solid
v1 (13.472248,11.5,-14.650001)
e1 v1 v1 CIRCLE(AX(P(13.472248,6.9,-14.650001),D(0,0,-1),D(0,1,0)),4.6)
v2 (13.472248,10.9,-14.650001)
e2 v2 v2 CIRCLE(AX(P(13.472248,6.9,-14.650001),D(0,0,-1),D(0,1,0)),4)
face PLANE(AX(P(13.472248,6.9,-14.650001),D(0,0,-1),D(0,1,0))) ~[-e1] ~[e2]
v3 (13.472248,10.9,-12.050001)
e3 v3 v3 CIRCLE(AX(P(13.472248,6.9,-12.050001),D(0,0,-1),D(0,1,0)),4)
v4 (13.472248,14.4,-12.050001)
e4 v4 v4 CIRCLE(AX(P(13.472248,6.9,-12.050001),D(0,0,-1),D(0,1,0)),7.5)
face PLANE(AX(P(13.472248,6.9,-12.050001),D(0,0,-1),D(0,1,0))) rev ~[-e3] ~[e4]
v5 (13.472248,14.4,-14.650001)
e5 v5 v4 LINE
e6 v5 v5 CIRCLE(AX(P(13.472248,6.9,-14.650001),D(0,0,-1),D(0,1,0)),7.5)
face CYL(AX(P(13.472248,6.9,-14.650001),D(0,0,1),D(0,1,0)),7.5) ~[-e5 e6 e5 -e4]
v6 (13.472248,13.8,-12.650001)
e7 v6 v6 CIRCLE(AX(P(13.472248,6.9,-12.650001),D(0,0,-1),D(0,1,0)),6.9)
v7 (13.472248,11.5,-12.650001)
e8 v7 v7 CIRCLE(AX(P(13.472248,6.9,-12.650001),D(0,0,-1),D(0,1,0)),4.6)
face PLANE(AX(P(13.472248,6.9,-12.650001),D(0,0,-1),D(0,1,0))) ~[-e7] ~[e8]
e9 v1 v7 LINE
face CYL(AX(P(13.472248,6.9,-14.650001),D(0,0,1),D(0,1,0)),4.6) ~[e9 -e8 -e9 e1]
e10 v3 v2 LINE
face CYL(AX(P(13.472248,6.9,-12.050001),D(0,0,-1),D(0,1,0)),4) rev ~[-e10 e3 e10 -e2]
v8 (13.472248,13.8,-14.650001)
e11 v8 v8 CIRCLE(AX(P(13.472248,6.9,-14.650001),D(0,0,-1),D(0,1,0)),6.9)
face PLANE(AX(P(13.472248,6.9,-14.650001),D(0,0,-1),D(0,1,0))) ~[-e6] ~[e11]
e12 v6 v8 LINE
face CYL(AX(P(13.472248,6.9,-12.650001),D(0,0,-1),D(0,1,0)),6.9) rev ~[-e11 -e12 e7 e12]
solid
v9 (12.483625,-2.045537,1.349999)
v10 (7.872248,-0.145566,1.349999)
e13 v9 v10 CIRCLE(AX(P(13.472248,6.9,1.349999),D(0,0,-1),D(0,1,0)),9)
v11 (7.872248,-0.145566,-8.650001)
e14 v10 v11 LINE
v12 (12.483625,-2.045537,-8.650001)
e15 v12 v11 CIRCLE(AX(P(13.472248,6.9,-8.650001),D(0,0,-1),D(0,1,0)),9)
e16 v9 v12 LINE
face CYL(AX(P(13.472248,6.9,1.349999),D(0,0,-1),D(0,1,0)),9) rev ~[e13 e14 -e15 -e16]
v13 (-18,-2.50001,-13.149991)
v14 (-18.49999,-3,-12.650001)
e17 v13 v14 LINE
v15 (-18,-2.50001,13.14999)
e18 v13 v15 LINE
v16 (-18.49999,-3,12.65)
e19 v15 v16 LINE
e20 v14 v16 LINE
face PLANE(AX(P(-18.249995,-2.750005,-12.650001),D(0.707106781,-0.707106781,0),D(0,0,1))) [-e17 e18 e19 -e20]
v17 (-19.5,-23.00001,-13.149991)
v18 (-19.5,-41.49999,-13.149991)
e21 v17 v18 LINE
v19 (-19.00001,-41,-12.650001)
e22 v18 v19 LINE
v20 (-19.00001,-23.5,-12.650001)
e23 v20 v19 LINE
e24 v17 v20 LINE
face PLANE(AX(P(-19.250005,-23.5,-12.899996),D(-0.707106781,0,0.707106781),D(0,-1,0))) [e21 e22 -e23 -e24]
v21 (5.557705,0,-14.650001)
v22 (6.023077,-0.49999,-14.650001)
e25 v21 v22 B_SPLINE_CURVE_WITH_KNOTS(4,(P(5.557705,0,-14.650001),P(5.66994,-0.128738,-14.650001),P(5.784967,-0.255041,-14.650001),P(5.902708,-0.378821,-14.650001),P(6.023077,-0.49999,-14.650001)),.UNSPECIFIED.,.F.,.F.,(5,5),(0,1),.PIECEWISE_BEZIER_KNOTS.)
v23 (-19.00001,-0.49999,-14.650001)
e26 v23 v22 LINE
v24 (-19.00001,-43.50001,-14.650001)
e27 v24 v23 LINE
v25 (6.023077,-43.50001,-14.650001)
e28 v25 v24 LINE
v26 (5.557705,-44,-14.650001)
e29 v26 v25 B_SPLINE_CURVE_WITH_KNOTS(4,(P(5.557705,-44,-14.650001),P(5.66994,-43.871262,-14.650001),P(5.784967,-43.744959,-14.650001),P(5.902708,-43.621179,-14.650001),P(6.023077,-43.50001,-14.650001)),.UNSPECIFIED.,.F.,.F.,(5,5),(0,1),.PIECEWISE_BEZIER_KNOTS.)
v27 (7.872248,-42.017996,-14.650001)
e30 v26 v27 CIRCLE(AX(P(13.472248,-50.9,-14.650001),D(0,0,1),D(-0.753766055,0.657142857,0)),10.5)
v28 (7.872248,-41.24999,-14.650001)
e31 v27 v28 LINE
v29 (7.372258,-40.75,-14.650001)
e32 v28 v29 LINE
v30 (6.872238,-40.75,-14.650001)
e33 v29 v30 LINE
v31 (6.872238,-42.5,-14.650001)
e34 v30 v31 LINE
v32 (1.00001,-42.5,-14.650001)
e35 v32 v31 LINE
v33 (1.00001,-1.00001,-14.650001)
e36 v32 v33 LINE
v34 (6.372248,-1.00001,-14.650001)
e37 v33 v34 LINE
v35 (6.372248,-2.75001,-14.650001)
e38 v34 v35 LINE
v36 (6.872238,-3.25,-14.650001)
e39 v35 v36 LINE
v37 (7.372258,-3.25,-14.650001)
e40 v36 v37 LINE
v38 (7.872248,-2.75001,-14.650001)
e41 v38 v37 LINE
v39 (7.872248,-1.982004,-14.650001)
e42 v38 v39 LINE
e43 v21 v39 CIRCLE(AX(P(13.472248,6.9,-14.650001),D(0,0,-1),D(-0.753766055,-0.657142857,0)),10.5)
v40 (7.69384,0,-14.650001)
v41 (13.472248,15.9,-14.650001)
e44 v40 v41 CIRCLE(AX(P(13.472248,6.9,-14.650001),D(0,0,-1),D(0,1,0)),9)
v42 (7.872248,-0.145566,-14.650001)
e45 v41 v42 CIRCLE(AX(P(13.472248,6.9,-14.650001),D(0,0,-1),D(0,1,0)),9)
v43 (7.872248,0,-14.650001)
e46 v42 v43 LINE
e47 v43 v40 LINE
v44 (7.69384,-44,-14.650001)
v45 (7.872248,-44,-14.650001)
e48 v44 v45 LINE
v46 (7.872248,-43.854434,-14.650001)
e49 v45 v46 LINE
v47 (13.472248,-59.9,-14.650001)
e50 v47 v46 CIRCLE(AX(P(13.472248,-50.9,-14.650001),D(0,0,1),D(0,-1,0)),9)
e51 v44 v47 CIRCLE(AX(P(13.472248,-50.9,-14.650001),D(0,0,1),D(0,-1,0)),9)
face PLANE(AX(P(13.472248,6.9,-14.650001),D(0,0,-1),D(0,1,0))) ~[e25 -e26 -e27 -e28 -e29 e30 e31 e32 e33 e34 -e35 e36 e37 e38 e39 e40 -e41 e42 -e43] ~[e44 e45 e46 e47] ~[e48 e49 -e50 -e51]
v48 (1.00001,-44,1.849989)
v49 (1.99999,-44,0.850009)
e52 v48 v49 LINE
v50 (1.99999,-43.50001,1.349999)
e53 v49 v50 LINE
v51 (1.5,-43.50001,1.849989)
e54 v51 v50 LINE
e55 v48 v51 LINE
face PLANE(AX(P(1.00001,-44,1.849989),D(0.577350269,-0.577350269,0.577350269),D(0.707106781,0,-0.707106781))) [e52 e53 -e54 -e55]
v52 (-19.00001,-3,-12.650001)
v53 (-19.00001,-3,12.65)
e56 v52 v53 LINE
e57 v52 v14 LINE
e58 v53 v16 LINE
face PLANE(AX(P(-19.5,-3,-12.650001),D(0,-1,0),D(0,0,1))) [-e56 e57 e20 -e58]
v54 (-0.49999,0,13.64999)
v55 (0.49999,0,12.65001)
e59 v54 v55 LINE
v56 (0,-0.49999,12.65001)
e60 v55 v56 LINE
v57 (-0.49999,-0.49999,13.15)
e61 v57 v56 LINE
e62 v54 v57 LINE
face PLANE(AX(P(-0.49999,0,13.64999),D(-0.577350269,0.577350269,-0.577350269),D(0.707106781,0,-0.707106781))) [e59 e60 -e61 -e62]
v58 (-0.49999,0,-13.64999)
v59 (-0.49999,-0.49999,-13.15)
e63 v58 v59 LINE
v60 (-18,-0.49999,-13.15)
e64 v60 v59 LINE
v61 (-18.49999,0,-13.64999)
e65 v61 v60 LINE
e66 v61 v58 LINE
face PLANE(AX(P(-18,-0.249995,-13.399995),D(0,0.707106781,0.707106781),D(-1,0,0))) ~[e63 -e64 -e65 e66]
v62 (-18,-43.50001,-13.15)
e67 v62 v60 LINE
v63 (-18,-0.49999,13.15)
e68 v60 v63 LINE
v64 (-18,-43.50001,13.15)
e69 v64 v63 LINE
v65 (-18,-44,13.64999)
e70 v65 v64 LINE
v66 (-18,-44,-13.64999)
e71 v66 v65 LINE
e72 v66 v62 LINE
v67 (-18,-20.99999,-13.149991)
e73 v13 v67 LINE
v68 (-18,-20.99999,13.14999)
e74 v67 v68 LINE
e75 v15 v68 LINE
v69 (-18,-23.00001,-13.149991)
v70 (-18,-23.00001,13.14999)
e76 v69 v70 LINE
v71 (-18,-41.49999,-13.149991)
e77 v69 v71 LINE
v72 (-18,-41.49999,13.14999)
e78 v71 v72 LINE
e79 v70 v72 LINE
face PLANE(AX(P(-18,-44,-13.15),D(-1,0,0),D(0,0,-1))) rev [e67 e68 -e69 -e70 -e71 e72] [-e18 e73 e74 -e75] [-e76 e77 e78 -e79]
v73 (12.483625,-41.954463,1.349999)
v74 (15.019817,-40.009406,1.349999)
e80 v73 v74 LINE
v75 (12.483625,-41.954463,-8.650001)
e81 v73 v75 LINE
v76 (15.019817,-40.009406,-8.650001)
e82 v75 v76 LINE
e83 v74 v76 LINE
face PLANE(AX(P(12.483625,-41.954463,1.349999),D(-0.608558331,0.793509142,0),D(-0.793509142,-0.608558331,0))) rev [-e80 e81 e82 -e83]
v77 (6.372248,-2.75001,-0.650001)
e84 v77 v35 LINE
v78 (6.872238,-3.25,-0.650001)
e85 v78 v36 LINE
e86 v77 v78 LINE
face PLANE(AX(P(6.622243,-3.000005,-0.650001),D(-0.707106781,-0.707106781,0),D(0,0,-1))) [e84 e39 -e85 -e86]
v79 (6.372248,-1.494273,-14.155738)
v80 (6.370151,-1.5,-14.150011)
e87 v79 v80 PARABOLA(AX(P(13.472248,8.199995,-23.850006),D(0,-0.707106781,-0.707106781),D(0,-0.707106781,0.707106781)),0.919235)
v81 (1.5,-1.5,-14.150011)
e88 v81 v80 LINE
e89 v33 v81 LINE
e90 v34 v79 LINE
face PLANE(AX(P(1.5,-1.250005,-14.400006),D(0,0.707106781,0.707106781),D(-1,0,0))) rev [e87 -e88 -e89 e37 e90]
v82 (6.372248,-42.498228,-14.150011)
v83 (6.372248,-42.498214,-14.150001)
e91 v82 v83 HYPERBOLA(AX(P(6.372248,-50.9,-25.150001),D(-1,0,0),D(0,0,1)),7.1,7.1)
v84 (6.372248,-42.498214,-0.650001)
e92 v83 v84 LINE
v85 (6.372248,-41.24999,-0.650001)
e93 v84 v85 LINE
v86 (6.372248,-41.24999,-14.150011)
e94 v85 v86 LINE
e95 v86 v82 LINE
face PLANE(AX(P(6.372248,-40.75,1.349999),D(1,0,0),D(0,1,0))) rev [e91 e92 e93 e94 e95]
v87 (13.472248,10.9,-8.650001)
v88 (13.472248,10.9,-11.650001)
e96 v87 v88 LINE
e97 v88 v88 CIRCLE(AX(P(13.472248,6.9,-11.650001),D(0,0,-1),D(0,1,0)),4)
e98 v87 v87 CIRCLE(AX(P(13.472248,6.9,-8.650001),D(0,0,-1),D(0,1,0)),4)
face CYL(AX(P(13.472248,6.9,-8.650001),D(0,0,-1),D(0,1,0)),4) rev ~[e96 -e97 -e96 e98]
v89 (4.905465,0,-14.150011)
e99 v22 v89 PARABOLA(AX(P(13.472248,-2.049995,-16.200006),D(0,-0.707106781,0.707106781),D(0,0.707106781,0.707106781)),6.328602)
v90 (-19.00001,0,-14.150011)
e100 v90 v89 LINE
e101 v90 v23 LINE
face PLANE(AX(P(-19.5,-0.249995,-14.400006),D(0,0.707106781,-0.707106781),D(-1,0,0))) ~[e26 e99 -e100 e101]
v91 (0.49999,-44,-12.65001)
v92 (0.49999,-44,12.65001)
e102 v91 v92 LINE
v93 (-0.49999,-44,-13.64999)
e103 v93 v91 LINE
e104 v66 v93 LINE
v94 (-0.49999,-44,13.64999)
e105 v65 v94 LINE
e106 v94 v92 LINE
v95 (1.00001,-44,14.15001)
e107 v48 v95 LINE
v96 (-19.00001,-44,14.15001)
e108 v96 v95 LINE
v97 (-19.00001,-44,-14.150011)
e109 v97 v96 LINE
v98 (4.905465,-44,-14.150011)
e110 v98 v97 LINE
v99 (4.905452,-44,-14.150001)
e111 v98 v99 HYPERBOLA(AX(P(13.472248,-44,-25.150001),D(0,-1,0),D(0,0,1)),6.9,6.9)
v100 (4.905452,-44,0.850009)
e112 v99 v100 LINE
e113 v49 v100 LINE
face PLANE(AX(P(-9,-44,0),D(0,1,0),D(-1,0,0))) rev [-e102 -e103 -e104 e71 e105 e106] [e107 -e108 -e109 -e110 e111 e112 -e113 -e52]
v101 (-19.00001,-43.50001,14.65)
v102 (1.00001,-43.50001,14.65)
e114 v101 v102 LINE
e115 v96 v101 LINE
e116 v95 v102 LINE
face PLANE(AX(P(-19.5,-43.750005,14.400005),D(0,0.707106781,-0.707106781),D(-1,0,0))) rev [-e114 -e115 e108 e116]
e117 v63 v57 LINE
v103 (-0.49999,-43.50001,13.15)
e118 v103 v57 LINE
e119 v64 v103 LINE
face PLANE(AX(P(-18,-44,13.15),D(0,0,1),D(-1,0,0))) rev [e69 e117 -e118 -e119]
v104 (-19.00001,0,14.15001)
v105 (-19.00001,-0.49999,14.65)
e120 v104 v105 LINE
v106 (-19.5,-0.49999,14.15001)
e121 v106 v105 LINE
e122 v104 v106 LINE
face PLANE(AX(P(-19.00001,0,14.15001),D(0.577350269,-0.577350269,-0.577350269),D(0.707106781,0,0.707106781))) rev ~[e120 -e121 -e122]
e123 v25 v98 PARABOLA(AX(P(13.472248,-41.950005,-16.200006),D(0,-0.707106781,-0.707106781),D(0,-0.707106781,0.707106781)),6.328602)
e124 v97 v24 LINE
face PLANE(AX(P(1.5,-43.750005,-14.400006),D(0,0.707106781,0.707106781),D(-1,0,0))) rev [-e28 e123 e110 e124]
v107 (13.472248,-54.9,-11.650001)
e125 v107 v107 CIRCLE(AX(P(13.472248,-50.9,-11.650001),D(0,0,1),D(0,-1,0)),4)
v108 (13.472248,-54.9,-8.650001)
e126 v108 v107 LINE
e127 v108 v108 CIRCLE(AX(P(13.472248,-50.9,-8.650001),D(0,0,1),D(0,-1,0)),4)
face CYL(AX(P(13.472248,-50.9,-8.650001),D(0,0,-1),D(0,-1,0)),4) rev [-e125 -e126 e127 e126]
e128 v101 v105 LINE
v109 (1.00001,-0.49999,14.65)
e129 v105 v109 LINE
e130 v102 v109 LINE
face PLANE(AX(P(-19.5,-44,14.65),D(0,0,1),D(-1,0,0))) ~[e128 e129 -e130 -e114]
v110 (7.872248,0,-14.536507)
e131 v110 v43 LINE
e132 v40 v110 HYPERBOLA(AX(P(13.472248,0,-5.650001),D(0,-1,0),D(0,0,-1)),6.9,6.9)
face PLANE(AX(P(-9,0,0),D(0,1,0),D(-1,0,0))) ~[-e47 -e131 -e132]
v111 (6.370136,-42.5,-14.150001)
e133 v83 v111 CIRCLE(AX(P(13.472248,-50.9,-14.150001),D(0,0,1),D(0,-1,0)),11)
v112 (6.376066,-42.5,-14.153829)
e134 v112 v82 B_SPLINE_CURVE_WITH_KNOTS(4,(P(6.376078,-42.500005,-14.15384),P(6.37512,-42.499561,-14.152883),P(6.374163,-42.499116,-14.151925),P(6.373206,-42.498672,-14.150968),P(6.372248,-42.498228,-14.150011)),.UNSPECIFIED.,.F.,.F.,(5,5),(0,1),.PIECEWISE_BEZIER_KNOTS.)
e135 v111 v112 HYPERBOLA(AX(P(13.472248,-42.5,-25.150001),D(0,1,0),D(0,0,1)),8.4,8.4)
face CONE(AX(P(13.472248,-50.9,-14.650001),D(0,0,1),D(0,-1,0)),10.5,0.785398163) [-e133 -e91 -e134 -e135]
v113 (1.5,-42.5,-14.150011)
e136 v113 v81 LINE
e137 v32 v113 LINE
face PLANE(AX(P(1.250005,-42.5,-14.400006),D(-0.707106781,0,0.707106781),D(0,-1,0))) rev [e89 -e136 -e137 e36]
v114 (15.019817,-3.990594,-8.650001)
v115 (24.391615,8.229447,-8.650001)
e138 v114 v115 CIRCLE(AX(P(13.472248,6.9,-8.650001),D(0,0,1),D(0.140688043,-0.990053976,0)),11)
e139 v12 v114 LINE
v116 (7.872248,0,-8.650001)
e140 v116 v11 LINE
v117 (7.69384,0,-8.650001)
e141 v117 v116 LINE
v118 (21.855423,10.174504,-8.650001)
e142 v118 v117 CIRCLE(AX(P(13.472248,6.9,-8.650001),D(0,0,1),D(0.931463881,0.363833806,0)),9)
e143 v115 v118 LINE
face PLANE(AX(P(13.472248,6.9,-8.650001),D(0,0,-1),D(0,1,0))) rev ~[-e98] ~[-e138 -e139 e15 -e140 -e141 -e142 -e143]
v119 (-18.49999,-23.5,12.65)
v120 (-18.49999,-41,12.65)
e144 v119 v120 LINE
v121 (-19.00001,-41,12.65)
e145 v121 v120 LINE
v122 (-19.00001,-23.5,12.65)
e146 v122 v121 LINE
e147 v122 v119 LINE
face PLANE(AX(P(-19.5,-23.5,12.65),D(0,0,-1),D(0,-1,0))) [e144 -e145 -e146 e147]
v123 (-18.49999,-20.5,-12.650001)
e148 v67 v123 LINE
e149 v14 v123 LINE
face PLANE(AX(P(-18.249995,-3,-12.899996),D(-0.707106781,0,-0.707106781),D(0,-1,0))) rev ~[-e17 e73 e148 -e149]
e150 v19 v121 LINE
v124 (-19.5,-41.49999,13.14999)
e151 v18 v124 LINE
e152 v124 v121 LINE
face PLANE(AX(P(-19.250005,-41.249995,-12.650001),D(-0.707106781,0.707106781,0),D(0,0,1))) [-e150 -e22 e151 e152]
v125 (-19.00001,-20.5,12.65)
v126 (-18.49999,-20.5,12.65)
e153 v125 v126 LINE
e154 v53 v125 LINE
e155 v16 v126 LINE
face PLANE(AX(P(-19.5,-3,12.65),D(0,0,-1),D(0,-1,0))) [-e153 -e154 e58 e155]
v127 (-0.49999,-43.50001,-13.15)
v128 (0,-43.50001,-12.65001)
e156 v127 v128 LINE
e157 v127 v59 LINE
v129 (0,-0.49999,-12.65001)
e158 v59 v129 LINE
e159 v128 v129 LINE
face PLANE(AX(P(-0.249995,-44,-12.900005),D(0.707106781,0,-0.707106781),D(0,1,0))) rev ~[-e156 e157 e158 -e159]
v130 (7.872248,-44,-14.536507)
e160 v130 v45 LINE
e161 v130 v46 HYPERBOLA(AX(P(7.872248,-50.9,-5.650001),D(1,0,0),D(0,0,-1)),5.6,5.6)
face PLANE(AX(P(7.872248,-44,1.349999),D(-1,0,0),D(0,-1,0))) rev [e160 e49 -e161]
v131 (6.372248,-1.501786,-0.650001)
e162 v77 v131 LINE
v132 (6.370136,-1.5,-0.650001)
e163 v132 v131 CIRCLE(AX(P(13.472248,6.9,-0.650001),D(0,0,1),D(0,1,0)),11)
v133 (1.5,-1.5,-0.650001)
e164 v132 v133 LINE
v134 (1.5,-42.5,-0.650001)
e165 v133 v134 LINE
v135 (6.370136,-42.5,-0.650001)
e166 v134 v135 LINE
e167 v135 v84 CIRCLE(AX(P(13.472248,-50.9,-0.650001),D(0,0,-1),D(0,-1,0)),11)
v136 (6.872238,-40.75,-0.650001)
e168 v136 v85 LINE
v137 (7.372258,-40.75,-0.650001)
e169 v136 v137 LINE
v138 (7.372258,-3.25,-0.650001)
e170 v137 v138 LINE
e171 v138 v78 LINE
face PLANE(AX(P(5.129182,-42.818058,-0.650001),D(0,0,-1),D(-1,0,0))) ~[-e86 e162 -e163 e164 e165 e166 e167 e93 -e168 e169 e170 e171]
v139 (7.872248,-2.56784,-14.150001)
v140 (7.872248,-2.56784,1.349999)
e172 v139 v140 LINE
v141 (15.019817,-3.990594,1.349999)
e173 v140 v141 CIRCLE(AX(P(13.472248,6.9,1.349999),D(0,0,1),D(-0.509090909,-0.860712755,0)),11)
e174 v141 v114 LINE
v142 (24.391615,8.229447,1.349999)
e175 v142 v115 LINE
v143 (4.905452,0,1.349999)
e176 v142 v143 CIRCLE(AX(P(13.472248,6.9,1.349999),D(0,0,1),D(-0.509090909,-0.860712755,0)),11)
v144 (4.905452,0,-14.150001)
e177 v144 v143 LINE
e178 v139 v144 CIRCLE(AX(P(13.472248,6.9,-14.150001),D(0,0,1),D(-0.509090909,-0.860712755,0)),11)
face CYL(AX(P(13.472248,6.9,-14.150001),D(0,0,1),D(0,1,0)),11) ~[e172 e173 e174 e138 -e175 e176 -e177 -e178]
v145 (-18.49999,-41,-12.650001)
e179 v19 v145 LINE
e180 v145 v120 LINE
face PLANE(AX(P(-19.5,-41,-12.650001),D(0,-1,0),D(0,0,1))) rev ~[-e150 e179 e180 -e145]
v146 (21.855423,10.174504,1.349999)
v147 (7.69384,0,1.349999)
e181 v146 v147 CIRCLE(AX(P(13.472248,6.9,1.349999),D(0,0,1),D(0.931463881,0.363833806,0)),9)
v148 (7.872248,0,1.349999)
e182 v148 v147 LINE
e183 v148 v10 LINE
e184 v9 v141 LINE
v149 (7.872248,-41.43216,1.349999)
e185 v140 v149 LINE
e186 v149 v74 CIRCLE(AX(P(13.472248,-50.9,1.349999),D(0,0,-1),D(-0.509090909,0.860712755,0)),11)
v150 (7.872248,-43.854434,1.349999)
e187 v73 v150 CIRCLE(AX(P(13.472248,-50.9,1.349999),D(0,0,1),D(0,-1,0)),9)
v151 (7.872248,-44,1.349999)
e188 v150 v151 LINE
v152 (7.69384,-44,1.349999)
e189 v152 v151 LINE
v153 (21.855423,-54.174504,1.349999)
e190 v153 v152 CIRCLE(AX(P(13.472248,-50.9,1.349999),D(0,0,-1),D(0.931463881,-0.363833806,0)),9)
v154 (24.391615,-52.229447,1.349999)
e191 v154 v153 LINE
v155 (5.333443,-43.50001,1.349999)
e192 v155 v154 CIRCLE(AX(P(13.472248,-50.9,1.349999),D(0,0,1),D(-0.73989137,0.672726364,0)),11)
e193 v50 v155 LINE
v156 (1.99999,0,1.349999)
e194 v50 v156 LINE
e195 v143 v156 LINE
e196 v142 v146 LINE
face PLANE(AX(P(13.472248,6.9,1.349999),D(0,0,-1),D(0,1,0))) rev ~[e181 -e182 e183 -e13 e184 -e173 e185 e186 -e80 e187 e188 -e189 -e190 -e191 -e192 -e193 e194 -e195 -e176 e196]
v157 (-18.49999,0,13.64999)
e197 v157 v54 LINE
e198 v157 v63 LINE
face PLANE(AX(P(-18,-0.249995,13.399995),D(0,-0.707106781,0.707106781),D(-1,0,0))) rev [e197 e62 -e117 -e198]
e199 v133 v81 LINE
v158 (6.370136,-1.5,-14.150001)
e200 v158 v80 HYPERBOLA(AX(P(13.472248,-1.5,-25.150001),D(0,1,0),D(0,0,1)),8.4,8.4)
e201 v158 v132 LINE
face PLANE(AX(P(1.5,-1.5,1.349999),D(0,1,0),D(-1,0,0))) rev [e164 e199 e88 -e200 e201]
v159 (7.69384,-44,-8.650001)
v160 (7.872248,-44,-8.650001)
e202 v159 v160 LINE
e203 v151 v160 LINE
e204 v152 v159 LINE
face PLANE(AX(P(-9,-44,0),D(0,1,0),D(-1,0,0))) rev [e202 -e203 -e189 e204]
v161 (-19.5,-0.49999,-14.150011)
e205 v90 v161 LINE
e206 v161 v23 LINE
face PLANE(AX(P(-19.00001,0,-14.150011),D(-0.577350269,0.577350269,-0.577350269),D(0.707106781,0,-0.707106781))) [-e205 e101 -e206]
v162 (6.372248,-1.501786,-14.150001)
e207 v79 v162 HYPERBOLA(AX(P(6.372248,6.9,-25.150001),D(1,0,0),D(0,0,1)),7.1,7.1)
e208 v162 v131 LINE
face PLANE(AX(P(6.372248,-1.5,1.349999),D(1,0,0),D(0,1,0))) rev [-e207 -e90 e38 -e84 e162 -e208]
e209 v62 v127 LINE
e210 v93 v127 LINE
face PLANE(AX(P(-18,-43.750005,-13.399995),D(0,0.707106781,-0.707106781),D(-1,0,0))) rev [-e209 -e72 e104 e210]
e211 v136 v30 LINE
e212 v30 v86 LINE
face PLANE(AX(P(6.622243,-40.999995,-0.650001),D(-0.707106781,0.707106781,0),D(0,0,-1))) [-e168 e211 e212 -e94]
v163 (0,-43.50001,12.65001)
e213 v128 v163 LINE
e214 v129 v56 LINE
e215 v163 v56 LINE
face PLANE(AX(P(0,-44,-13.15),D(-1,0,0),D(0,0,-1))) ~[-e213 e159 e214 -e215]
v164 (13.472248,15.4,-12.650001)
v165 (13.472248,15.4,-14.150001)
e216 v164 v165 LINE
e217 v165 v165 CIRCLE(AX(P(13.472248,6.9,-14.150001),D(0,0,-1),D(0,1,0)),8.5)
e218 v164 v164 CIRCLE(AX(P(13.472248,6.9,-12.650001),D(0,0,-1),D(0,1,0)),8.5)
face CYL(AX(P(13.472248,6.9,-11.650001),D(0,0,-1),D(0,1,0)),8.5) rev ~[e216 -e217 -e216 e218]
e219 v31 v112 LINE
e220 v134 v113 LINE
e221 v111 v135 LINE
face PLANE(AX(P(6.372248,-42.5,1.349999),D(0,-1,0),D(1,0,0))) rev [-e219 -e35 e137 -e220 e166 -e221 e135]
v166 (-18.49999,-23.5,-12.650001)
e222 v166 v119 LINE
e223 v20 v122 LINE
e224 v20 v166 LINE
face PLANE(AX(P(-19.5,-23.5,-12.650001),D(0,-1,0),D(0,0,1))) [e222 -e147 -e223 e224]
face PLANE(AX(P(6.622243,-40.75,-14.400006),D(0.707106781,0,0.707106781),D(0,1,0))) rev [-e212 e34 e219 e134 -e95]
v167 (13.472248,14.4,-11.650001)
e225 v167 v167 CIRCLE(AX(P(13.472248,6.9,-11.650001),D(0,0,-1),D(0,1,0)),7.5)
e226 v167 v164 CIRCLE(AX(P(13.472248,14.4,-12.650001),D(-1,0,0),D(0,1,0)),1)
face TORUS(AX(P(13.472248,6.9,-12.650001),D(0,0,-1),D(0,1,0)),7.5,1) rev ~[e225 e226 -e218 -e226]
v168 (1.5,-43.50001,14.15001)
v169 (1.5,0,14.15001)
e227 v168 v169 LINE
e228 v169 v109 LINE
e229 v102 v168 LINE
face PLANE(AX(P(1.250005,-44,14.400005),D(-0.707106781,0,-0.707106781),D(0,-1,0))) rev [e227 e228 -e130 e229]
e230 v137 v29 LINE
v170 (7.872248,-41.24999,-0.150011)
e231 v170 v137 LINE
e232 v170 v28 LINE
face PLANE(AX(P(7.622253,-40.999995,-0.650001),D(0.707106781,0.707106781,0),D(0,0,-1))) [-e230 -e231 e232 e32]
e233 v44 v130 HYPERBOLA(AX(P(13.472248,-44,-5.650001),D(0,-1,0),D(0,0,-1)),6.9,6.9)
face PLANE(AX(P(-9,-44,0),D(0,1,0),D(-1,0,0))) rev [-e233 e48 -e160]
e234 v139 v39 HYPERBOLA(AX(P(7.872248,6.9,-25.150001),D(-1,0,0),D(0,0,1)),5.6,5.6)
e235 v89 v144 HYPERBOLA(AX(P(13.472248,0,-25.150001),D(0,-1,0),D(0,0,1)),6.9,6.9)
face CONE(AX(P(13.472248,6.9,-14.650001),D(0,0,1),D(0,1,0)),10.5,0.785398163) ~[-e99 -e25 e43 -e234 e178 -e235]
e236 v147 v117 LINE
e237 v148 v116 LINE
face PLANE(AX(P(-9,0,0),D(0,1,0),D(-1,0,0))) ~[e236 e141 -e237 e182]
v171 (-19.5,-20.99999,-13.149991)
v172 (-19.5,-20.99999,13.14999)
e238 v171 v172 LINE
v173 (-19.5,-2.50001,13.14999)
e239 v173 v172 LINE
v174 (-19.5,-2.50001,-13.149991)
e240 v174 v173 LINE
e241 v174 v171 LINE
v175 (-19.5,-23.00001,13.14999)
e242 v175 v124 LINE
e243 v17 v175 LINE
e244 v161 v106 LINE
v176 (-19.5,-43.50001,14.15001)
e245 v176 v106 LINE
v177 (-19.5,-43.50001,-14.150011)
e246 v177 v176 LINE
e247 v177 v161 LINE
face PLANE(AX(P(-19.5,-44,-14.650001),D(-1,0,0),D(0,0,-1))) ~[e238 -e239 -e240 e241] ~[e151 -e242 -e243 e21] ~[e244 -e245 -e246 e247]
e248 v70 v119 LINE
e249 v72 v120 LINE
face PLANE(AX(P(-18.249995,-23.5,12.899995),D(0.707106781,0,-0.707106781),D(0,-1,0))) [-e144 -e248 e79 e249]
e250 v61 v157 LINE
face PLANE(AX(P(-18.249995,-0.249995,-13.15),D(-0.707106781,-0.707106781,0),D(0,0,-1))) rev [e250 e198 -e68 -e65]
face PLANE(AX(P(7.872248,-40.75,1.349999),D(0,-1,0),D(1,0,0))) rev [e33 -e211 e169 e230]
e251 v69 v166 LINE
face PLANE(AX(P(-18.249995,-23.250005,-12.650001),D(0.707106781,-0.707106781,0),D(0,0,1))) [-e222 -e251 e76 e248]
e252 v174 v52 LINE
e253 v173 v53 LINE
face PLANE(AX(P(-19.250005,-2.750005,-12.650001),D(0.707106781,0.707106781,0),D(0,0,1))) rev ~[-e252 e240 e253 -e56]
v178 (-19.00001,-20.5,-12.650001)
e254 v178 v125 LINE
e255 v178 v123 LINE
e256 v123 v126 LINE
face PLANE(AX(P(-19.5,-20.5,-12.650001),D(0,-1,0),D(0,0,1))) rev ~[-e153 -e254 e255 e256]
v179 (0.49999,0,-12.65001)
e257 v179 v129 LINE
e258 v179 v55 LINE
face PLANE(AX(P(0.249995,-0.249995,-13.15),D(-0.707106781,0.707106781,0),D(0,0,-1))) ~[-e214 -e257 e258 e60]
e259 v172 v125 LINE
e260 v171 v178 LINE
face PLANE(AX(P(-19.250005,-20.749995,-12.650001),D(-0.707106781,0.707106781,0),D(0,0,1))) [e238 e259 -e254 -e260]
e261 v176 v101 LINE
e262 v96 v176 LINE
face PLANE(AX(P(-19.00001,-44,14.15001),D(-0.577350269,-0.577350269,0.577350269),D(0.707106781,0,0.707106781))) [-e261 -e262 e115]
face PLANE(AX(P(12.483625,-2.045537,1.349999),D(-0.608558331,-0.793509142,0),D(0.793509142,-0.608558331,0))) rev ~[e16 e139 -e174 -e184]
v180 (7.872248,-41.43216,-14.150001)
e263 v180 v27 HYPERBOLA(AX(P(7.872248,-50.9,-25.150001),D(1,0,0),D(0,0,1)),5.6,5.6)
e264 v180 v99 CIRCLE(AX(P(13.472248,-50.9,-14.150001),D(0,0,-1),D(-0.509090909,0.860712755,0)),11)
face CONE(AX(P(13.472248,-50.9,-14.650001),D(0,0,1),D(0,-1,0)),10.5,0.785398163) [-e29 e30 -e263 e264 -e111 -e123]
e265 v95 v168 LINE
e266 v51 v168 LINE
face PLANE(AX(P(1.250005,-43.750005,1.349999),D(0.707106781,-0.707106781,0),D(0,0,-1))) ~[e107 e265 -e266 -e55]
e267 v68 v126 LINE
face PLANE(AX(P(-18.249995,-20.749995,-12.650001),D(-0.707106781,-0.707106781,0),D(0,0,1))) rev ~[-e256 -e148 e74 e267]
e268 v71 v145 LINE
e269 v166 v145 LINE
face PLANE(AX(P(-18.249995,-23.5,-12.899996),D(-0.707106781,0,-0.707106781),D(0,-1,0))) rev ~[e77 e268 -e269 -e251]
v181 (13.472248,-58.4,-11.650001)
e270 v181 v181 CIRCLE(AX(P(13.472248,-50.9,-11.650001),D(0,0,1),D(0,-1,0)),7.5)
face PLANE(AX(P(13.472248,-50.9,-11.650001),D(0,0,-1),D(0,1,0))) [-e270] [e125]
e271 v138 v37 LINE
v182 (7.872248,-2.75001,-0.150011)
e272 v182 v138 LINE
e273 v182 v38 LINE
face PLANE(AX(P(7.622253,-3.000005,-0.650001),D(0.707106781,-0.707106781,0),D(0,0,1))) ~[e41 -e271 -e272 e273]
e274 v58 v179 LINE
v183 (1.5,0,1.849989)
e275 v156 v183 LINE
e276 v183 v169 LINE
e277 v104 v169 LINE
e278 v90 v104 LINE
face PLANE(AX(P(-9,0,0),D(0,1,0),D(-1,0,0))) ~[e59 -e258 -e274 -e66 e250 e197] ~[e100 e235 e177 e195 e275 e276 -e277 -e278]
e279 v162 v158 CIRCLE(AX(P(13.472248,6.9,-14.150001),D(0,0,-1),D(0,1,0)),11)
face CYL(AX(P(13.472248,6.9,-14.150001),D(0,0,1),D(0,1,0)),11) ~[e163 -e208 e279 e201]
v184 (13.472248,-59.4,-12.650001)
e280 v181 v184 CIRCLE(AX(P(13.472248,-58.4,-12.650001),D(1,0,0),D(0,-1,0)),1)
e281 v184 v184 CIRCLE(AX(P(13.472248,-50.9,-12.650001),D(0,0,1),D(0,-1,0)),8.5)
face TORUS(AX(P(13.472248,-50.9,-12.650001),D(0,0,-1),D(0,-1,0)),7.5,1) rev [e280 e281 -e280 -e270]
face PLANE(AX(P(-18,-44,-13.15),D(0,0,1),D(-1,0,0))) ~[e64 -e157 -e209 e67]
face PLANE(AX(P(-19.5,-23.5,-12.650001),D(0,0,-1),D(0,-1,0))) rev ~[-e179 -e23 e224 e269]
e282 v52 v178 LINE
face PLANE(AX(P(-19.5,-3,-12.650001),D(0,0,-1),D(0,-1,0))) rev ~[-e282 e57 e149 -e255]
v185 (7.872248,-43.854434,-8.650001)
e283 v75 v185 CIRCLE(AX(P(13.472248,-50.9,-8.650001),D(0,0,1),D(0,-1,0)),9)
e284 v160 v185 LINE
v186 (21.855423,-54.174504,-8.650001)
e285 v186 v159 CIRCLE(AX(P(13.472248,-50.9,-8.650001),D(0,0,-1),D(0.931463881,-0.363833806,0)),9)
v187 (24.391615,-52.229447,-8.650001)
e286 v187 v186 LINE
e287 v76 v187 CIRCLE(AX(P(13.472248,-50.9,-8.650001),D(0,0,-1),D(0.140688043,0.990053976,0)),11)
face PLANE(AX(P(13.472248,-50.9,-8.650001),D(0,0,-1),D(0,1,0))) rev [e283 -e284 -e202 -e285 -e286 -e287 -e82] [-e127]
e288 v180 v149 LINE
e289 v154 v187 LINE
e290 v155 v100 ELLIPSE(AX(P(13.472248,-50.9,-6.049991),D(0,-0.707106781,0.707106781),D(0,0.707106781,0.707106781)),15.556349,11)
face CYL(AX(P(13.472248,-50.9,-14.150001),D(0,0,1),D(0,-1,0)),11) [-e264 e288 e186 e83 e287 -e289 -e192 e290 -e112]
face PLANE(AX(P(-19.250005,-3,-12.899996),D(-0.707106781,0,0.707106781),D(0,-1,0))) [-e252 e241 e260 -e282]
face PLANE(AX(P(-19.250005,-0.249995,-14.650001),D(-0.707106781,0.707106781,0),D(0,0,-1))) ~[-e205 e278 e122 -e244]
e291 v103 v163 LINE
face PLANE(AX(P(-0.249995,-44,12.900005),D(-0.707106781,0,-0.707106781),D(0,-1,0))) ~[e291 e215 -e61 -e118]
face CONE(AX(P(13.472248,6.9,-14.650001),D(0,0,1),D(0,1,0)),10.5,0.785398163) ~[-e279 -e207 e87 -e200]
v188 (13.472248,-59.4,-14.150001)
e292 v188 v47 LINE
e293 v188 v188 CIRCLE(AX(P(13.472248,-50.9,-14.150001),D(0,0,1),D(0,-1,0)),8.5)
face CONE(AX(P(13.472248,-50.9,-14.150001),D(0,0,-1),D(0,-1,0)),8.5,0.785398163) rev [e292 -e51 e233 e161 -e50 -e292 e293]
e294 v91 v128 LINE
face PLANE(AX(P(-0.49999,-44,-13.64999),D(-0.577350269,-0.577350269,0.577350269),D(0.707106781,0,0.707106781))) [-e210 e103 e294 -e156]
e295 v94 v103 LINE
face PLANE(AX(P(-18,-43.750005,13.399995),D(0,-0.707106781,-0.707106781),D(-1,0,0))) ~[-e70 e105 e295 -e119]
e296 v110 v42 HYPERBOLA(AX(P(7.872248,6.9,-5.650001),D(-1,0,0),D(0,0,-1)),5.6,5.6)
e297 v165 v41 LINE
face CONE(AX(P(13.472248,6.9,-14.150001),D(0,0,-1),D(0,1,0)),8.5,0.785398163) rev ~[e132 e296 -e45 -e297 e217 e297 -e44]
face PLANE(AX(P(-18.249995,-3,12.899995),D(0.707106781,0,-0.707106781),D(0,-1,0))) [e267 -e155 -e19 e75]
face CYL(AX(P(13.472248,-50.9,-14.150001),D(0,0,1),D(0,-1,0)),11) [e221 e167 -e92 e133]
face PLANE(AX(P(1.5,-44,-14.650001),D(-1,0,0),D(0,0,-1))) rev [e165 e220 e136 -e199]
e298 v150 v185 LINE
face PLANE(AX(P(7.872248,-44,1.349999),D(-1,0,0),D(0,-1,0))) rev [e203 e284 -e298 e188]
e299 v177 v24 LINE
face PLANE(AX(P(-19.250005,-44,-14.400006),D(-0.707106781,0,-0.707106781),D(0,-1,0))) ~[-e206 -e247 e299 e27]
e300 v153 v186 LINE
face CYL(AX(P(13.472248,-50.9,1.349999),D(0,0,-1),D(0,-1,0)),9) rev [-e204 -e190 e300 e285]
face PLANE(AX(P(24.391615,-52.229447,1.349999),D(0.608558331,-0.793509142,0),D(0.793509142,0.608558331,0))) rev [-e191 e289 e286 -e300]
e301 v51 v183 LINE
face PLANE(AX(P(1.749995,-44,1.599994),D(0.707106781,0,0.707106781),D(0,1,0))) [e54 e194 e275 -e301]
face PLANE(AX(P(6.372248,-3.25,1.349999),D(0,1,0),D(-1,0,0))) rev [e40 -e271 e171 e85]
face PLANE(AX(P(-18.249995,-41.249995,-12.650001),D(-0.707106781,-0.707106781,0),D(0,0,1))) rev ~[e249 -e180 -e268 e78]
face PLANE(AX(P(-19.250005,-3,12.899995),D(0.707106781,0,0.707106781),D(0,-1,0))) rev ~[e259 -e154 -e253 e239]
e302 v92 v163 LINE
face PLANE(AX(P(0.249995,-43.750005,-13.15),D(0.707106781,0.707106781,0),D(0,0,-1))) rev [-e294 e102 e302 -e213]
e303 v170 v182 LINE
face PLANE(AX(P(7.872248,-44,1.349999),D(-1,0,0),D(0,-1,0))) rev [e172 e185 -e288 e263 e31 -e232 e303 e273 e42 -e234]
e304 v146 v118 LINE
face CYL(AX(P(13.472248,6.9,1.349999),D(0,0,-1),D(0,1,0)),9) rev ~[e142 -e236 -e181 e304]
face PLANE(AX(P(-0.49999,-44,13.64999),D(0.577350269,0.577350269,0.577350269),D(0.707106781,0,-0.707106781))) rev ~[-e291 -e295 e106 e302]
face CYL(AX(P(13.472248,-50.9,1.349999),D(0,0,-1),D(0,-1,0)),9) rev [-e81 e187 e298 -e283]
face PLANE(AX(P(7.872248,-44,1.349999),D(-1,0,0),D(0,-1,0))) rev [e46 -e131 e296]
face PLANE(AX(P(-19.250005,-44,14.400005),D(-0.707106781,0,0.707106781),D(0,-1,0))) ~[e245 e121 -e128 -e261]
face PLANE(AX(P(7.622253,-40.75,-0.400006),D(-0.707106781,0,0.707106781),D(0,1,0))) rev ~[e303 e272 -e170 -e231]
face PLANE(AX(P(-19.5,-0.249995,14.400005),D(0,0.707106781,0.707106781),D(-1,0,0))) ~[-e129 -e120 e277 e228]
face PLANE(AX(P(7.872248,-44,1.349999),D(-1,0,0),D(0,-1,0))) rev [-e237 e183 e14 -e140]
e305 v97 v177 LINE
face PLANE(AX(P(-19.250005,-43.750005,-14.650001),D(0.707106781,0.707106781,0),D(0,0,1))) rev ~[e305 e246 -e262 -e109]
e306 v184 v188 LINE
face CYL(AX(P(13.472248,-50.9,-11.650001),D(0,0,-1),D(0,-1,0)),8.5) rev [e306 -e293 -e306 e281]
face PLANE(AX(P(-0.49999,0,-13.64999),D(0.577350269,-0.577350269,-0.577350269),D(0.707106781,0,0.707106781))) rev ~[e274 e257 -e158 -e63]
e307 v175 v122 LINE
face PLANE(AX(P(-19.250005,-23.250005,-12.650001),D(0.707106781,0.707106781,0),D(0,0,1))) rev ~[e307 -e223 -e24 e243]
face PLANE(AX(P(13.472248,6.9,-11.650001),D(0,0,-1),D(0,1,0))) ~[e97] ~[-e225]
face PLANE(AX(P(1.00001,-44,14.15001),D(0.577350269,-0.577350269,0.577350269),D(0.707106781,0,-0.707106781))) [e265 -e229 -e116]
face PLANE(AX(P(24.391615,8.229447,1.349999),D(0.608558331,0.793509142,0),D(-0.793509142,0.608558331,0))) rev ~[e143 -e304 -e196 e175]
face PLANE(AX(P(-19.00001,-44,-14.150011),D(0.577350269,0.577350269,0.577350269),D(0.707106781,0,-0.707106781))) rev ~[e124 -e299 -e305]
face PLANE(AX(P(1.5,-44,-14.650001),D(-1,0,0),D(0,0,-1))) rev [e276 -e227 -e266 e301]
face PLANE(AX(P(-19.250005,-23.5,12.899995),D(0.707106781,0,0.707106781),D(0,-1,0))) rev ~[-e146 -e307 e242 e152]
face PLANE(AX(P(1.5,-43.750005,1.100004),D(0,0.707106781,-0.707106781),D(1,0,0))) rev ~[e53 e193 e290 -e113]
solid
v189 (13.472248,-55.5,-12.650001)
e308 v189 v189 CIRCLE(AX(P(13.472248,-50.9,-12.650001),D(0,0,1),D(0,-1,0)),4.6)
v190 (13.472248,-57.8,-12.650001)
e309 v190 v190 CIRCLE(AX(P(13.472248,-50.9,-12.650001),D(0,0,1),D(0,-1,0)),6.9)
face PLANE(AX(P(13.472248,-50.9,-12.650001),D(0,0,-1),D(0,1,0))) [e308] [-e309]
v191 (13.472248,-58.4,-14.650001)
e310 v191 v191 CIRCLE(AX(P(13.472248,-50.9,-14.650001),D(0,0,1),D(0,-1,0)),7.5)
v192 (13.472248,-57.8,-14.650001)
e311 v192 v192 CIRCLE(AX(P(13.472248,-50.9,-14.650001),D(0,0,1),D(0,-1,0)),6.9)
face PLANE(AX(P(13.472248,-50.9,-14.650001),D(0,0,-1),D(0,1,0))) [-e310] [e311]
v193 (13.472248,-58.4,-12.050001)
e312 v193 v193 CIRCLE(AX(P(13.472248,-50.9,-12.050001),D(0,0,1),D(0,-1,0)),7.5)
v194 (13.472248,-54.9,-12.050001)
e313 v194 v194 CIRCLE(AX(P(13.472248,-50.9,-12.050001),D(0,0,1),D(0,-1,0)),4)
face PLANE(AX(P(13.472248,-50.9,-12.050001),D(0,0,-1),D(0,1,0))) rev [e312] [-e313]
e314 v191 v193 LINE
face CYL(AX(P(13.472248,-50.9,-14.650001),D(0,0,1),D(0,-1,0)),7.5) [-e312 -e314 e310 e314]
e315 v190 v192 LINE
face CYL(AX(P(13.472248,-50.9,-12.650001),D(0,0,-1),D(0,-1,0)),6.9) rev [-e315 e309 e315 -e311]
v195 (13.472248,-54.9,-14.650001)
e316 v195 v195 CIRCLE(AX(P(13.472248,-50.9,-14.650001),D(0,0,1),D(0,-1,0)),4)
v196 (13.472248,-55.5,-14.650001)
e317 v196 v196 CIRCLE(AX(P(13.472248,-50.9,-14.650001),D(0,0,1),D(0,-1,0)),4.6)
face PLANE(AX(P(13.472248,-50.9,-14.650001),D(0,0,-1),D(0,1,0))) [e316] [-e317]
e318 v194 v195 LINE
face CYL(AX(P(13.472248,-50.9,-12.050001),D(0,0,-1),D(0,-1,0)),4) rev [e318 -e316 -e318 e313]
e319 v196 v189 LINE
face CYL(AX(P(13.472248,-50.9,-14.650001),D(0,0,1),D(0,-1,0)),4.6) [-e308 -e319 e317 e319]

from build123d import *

# Parameters (mm, degrees)
F0_W      = 21
F0_H      = 29.3000006603
F0_W_2    = 18
F0_H_2    = 26.3
F1_DEPTH  = 44
F3_W      = 1.5
F3_H      = 37.5
F4_DEPTH  = 2
F5_DEPTH  = 16
F10_R     = 1
F12_DEPTH = 10
F16_W     = 17.5
F16_H     = 25.3000006603
F17_DEPTH = 1.5
F18_SIZE  = 0.49999


# Not quite as in the source:
# - a fillet or chamfer is up to 0.001 mm smaller than in the source, because OpenCascade refuses the exact size


with BuildPart() as f1:
    # F0 (on Front) → F1 (new body)
    with BuildSketch(Plane.XZ):
        with Locations((-9, -3.302e-07)):
            Rectangle(F0_W, F0_H)
        with Locations((-9, 0)):
            Rectangle(F0_W_2, F0_H_2, mode=Mode.SUBTRACT)
    extrude(amount=F1_DEPTH)

    # F3 (on offset) → F4 (join)
    with BuildSketch(Plane(origin=(0, 0, 1.3499993397), x_dir=(1, 0, 0), z_dir=(0, 0, -1))):
        Polygon((1.5, 1.5), (1.5, 0), (7.8722483143, 0), (7.8722483143, 3.25), (6.3722483143, 3.25), (6.3722483143, 1.5), align=None)
        with Locations((7.1222483143, 22)):
            Rectangle(F3_W, F3_H)
        Polygon((1.5, 42.5), (1.5, 1.5), (6.3722483143, 1.5), (6.3722483143, 3.25), (6.3722483143, 40.75), (6.3722483143, 42.5), align=None)
        Polygon((1.5, 44), (1.5, 42.5), (6.3722483143, 42.5), (6.3722483143, 40.75), (7.8722483143, 40.75), (7.8722483143, 44), align=None)
    extrude(amount=F4_DEPTH)

    # F3 (on offset) → F5 (join, through all)
    with BuildSketch(Plane(origin=(0, 0, 1.3499993397), x_dir=(1, 0, 0), z_dir=(0, 0, -1))):
        Polygon((1.5, 1.5), (1.5, 0), (7.8722483143, 0), (7.8722483143, 3.25), (6.3722483143, 3.25), (6.3722483143, 1.5), align=None)
        Polygon((1.5, 44), (1.5, 42.5), (6.3722483143, 42.5), (6.3722483143, 40.75), (7.8722483143, 40.75), (7.8722483143, 44), align=None)
    extrude(amount=F5_DEPTH)

    # F8 (on offset) → F9 (revolve)
    with BuildSketch(Plane.YZ.offset(13.4722483143)):
        Polygon((10.9, -8.6500006603), (10.9, -11.6500006603), (15.4, -11.6500006603), (15.4, -14.1500006603), (15.9, -14.6500006603), (17.4, -14.6500006603), (17.9, -14.1500006603), (17.9, 1.3499993397), (15.9, 1.3499993397), (15.9, -8.6500006603), align=None)
    revolve(axis=Axis((13.4722483143, 6.9, -10.1500006603), (0, 0, -1)))

    # F10
    f10_edges = [f1.edges().sort_by_distance(p)[0] for p in [
        (13.472248, -1.6, -11.650001),
    ]]
    fillet(f10_edges, radius=F10_R)

    # F11 (on face) → F12 (cut)
    with BuildSketch(Plane.XY.offset(1.3499993397)):
        with BuildLine():
            Line((24.3916150789, 8.2294470504), (21.8554232448, 10.1745042503))
            ThreePointArc((21.8554232448, 10.1745042503), (20.6138305896, 1.4229750224), (12.4836249498, -2.0455365319))
            Line((12.4836249498, -2.0455365319), (15.019816784, -3.9905937318))
            ThreePointArc((15.019816784, -3.9905937318), (22.200848873, 0.2058583608), (24.3916150789, 8.2294470504))
        make_face()
    extrude(amount=-F12_DEPTH, mode=Mode.SUBTRACT)


with BuildPart() as f9:
    # F8 (on offset) → F9, piece 2 (revolve)
    with BuildSketch(Plane.YZ.offset(13.4722483143)):
        Polygon((10.9, -12.0500006603), (10.9, -14.6500006603), (11.5, -14.6500006603), (11.5, -12.6500006603), (13.8, -12.6500006603), (13.8, -14.6500006603), (14.4, -14.6500006603), (14.4, -12.0500006603), (11.5, -12.0500006603), align=None)
    revolve(axis=Axis((13.4722483143, 6.9, -10.1500006603), (0, 0, -1)))


with BuildPart() as f14_1:
    # F14: instance of F1
    add(f1.part.mirror(Plane(origin=(0, -22, 0), x_dir=(-1, 0, 0), z_dir=(0, 1, 0))))

    # F15: union F1
    add(f1.part)

    # F16 (on face) → F17 (cut, through all)
    with BuildSketch(Plane(origin=(-19.5, 0, 0), x_dir=(0, -1, 0), z_dir=(-1, 0, 0))):
        with Locations((11.75, -3.302e-07)):
            Rectangle(F16_W, F16_H)
        with Locations((32.25, -3.302e-07)):
            Rectangle(F16_W, F16_H)
    extrude(amount=-F17_DEPTH, mode=Mode.SUBTRACT)

    # F18 (size 0.5 in the source; OpenCascade refuses exactly that, so slightly less here)
    f18_edges = [f14_1.edges().sort_by_distance(p)[0] for p in [
        (-19.5, -22, 14.65),
        (-19.5, -22, -14.650001),
        (-19.5, 0, 0),
        (-19.5, -44, 0),
        (1.5, -22, 14.65),
        (-9, 0, 14.65),
        (-9, -44, 14.65),
        (-19.5, -23.5, 0),
        (-19.5, -32.25, 12.65),
        (-18, -32.25, 12.65),
        (-18, -23.5, 0),
        (-18, -20.5, 0),
        (-18, -3, 0),
        (-18, 0, 0),
        (-18, -32.25, -12.650001),
        (-18, -11.75, -12.650001),
        (-18, -41, 0),
        (-9, -44, -13.15),
        (-9, 0, -13.15),
        (0, 0, 0),
        (0, -44, 0),
        (0, -22, -13.15),
        (0, -22, 13.15),
        (1.5, -22, 1.349999),
        (1.5, -44, 8),
        (7.872248, -3.25, -7.650001),
        (7.872248, -22, -0.650001),
        (7.872248, -40.75, -7.650001),
        (6.372248, -40.75, -7.650001),
        (6.372248, -41.625, -14.650001),
        (-6.971148, -44, -14.650001),
        (1.5, -22, -14.650001),
        (3.936124, -1.5, -14.650001),
        (6.372248, -3.25, -7.650001),
        (-19.5, -11.75, 12.65),
        (-18, -11.75, 12.65),
        (-19.5, -20.5, 0),
        (-19.5, -41, 0),
        (-19.5, -3, 0),
        (-19.5, -11.75, -12.650001),
        (-19.5, -32.25, -12.650001),
        (-6.971148, 0, -14.650001),
        (3.202726, -44, 1.349999),
        (-9, -44, 13.15),
        (-9, 0, 13.15),
    ]]
    chamfer(f18_edges, length=F18_SIZE)


with BuildPart() as f14_2:
    # F14: instance of F9
    add(f9.part.mirror(Plane(origin=(0, -22, 0), x_dir=(-1, 0, 0), z_dir=(0, 1, 0))))


solid = Compound([f9.part, f14_1.part, f14_2.part])
